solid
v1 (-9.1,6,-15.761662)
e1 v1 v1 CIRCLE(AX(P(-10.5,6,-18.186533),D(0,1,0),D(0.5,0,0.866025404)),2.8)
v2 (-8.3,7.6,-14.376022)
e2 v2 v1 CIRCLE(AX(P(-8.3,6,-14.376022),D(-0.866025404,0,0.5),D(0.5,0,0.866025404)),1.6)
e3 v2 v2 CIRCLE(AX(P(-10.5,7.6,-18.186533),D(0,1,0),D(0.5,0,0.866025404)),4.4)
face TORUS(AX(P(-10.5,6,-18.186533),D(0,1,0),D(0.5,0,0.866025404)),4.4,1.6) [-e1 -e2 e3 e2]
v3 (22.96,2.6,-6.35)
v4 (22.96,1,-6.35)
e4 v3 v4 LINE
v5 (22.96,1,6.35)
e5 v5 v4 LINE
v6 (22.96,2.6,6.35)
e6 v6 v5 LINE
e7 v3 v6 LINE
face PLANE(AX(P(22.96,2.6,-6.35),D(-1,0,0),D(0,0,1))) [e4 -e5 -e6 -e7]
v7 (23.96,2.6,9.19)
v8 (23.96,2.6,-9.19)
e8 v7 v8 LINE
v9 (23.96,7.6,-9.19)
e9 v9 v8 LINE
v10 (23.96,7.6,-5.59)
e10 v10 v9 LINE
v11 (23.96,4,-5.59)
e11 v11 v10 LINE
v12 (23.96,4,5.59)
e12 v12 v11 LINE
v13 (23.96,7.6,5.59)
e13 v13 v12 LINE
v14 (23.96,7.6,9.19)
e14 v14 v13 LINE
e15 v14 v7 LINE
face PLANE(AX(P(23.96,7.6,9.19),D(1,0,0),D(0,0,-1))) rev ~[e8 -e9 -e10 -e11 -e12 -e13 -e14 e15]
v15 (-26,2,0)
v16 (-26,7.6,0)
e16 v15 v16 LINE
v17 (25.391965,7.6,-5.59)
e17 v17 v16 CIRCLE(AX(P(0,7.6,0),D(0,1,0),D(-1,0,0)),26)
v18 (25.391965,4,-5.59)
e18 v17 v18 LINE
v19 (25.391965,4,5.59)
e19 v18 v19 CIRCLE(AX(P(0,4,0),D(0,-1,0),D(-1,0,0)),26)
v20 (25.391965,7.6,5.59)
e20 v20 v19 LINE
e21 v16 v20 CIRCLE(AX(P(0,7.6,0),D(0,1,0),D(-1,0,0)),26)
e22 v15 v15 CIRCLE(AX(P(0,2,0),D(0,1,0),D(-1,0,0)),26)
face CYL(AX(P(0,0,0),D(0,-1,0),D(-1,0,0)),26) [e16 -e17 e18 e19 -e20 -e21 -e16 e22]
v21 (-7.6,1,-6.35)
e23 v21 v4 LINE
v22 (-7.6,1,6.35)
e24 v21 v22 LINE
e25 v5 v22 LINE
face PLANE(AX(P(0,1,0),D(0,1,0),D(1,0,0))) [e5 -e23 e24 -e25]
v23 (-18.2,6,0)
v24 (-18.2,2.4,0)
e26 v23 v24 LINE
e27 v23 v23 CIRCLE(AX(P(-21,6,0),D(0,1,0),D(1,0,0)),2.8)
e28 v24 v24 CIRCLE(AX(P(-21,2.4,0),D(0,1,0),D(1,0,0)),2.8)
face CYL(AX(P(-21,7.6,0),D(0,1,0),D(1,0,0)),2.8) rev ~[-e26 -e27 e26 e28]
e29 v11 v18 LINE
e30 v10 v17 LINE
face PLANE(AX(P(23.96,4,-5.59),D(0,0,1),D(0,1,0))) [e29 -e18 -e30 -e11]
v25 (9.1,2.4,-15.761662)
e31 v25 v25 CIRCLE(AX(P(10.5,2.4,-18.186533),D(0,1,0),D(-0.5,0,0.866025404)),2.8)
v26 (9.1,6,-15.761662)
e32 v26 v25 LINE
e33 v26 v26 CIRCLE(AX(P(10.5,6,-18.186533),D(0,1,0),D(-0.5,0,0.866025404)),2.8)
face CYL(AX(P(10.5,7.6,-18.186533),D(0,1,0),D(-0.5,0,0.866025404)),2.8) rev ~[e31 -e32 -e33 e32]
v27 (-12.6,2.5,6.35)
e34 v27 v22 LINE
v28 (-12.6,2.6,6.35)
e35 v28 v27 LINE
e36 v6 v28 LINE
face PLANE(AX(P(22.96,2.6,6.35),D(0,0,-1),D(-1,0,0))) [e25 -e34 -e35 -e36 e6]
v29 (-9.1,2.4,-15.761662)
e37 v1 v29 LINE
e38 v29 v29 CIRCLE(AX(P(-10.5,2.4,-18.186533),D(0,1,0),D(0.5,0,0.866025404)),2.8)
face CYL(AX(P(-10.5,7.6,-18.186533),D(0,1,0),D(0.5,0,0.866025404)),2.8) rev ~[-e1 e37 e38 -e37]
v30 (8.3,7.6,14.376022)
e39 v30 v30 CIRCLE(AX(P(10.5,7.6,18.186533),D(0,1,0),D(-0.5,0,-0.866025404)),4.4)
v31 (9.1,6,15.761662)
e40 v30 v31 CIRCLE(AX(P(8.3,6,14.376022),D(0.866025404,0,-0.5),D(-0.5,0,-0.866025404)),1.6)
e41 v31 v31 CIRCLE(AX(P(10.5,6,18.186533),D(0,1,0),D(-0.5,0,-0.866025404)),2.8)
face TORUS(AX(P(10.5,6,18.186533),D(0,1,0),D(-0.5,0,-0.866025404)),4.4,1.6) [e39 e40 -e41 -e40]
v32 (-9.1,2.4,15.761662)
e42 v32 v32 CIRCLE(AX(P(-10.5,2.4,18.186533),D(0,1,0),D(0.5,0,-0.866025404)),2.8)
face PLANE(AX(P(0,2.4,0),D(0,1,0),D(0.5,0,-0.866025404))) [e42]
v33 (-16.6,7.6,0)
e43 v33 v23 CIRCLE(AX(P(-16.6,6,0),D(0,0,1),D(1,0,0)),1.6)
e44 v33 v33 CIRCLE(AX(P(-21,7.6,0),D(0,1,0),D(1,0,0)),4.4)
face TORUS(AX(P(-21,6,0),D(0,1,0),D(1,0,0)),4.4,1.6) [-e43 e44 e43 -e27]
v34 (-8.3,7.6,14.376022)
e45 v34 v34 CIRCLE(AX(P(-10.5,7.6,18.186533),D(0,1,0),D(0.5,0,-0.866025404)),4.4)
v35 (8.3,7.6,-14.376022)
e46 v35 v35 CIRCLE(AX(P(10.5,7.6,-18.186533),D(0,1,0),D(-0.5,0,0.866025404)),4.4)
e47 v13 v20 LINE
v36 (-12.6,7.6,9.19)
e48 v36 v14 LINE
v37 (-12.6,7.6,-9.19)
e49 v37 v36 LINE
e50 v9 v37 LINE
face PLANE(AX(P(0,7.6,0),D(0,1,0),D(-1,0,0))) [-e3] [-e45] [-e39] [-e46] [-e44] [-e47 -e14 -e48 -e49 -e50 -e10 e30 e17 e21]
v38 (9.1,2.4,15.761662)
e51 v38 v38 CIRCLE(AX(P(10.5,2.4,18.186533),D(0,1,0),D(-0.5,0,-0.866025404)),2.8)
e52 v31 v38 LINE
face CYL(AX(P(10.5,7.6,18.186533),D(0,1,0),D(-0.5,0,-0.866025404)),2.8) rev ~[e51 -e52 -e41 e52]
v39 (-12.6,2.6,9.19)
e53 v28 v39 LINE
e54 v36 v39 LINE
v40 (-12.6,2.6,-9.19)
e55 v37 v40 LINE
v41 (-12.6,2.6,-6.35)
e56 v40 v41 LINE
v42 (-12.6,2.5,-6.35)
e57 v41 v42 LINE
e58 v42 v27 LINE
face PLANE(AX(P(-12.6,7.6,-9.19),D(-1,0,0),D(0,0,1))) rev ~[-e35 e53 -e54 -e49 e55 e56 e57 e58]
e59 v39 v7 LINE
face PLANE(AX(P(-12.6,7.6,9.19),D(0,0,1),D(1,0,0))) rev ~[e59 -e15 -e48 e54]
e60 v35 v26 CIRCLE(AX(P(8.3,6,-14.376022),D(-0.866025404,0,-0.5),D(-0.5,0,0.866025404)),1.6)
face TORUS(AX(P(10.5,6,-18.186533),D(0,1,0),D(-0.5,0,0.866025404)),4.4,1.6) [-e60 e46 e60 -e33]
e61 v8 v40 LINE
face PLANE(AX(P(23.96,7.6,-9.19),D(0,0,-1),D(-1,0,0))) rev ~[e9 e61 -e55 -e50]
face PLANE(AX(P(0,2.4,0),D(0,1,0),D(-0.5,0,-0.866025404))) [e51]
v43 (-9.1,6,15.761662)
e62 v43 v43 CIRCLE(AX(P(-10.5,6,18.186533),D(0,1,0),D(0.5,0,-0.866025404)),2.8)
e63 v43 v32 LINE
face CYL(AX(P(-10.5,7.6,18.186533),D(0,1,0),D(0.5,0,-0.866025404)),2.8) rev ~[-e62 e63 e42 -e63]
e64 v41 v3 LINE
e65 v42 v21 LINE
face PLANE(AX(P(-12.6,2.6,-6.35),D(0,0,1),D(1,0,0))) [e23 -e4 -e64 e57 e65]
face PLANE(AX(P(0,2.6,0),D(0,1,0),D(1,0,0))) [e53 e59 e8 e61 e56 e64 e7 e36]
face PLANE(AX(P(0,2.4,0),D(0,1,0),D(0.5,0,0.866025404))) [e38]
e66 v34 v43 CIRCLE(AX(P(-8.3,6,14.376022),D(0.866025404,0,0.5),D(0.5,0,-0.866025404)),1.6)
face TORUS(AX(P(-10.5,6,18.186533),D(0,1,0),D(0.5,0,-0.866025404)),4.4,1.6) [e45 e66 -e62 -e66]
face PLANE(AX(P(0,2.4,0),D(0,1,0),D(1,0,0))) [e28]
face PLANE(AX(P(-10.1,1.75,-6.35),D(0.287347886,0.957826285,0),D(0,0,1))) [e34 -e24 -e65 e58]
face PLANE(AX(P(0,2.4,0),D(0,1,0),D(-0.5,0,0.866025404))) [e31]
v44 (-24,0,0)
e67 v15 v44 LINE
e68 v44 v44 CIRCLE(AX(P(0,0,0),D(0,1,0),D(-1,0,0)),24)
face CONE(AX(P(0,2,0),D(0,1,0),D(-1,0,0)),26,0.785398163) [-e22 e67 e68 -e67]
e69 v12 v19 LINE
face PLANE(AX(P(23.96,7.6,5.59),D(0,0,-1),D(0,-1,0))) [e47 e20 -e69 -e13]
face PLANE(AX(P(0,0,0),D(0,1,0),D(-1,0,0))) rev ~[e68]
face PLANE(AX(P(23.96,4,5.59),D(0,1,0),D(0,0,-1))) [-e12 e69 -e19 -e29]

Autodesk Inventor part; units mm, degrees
ref_plane "YZ Plane" through (0, 0, 0) normal (1, 0, 0) x (0, 1, 0)
ref_plane "XZ Plane" through (0, 0, 0) normal (0, 1, 0) x (-1, 0, 0)
ref_plane "XY Plane" through (0, 0, 0) normal (0, 0, 1) x (1, 0, 0)
sketch "Sketch1" plane through (0, 0, 0) normal (0, 1, 0) x (-1, 0, 0)
  circle A0 centre (0, 0) radius 26
  dimension "d0" = 52
extrude "Extrusion1" add sketch "Sketch1" along normal blind 7.6
chamfer "Chamfer2" distance 2 angle 45 1 edges at (26, 0, 0)
sketch "Sketch2" plane through (0, 7.6, 0) normal (0, 1, 0) x (1, 0, 0)
  line L0 (-12.6, -9.19) -> (23.96, -9.19)
  line L1 (23.96, -9.19) -> (23.96, 9.19)
  line L2 (23.96, 9.19) -> (-12.6, 9.19)
  line L3 (-12.6, 9.19) -> (-12.6, -9.19)
  point P0 (0, 0)
  dimension "d5" = 36.56
  dimension "d6" = 18.38
  dimension "d7" = 9.19
  dimension "d8" = 12.6
extrude "Extrusion2" cut sketch "Sketch2" against normal blind 5
sketch "Sketch3" plane through (23.96, 7.6, -9.19) normal (-1, 0, 0) x (0, 0, 1)
  line L0 (3.6, 0) -> (14.78, 0)
  line L1 (14.78, 0) -> (14.78, -3.6)
  line L2 (14.78, -3.6) -> (3.6, -3.6)
  line L3 (3.6, -3.6) -> (3.6, 0)
  line L4 (0, 0) -> (18.38, 0) projected
  line L5 (0, -5) -> (18.38, -5) projected
  line L6 (0, 0) -> (0, -5) projected
  line L7 (18.38, 0) -> (18.38, -5) projected
  point P0 (9.19, -7.6)
  dimension "d11" = 0
  dimension "d14" = 3.6
  dimension "d44" = 3.6
  dimension "d47" = 1.4
extrude "Extrusion3" cut sketch "Sketch3" against normal through all contours L0 L1 L2 L3
ref_plane "Work Plane1" through (-12.6, 7.6, 0) normal (0, 0, 1) x (1, 0, 0)
sketch "Sketch7" plane through (0, 2.6, 0) normal (0, 1, 0) x (1, 0, 0)
  line L0 (-12.6, 6.35) -> (22.96, 6.35)
  line L1 (22.96, 6.35) -> (22.96, -6.35)
  line L2 (22.96, -6.35) -> (-12.6, -6.35)
  line L3 (-12.6, -6.35) -> (-12.6, 6.35)
  line L4 (36.4, 0) -> (-36.4, 0) projected
  line L5 (-12.6, -9.19) -> (-12.6, 9.19) projected
  point P0 (0, 0)
  dimension "d28" = 12.7
  dimension "d29" = 35.56
  dimension "d30" = 6.35
  dimension "d31" = 0
extrude "Extrusion5" cut sketch "Sketch7" against normal blind 1.6
sketch "Sketch4" plane through (0, 7.6, 0) normal (0, 1, 0) x (1, 0, 0)
  circle A0 centre (-21, 0) radius 2.8
  arc A1 (25.392, 5.59) -> (25.392, -5.59) centre (0, 0) ccw projected
  point P0 (24.6995, 8.12)
  point P1 (24.6995, -8.12)
  dimension "d17" = 5.6
  dimension "d23" = 21
extrude "Extrusion4" cut sketch "Sketch4" against normal blind 5.2
fillet "Fillet4" radius 1.6 1 edges at (-23.8, 7.6, 0)
pattern_circular "Circular Pattern2" count 5 over 240 about axis through (0, 7.6, 0) along (0, 1, 0) of "Extrusion4", "Fillet4" both ways yes
chamfer "Chamfer3" distance 1.5 distance2 5 1 edges at (-12.6, 1, 0) measured on face at (-12.6, 5.9333, -2.1167)
equation "\"d7\" = 0.5 * d6"
equation "\"d44\" = d14"
equation "\"d30\" = 0.5 * d28"
equation "\"d24\" = 0.5 * d6"
properties part number "_3DPrint"
